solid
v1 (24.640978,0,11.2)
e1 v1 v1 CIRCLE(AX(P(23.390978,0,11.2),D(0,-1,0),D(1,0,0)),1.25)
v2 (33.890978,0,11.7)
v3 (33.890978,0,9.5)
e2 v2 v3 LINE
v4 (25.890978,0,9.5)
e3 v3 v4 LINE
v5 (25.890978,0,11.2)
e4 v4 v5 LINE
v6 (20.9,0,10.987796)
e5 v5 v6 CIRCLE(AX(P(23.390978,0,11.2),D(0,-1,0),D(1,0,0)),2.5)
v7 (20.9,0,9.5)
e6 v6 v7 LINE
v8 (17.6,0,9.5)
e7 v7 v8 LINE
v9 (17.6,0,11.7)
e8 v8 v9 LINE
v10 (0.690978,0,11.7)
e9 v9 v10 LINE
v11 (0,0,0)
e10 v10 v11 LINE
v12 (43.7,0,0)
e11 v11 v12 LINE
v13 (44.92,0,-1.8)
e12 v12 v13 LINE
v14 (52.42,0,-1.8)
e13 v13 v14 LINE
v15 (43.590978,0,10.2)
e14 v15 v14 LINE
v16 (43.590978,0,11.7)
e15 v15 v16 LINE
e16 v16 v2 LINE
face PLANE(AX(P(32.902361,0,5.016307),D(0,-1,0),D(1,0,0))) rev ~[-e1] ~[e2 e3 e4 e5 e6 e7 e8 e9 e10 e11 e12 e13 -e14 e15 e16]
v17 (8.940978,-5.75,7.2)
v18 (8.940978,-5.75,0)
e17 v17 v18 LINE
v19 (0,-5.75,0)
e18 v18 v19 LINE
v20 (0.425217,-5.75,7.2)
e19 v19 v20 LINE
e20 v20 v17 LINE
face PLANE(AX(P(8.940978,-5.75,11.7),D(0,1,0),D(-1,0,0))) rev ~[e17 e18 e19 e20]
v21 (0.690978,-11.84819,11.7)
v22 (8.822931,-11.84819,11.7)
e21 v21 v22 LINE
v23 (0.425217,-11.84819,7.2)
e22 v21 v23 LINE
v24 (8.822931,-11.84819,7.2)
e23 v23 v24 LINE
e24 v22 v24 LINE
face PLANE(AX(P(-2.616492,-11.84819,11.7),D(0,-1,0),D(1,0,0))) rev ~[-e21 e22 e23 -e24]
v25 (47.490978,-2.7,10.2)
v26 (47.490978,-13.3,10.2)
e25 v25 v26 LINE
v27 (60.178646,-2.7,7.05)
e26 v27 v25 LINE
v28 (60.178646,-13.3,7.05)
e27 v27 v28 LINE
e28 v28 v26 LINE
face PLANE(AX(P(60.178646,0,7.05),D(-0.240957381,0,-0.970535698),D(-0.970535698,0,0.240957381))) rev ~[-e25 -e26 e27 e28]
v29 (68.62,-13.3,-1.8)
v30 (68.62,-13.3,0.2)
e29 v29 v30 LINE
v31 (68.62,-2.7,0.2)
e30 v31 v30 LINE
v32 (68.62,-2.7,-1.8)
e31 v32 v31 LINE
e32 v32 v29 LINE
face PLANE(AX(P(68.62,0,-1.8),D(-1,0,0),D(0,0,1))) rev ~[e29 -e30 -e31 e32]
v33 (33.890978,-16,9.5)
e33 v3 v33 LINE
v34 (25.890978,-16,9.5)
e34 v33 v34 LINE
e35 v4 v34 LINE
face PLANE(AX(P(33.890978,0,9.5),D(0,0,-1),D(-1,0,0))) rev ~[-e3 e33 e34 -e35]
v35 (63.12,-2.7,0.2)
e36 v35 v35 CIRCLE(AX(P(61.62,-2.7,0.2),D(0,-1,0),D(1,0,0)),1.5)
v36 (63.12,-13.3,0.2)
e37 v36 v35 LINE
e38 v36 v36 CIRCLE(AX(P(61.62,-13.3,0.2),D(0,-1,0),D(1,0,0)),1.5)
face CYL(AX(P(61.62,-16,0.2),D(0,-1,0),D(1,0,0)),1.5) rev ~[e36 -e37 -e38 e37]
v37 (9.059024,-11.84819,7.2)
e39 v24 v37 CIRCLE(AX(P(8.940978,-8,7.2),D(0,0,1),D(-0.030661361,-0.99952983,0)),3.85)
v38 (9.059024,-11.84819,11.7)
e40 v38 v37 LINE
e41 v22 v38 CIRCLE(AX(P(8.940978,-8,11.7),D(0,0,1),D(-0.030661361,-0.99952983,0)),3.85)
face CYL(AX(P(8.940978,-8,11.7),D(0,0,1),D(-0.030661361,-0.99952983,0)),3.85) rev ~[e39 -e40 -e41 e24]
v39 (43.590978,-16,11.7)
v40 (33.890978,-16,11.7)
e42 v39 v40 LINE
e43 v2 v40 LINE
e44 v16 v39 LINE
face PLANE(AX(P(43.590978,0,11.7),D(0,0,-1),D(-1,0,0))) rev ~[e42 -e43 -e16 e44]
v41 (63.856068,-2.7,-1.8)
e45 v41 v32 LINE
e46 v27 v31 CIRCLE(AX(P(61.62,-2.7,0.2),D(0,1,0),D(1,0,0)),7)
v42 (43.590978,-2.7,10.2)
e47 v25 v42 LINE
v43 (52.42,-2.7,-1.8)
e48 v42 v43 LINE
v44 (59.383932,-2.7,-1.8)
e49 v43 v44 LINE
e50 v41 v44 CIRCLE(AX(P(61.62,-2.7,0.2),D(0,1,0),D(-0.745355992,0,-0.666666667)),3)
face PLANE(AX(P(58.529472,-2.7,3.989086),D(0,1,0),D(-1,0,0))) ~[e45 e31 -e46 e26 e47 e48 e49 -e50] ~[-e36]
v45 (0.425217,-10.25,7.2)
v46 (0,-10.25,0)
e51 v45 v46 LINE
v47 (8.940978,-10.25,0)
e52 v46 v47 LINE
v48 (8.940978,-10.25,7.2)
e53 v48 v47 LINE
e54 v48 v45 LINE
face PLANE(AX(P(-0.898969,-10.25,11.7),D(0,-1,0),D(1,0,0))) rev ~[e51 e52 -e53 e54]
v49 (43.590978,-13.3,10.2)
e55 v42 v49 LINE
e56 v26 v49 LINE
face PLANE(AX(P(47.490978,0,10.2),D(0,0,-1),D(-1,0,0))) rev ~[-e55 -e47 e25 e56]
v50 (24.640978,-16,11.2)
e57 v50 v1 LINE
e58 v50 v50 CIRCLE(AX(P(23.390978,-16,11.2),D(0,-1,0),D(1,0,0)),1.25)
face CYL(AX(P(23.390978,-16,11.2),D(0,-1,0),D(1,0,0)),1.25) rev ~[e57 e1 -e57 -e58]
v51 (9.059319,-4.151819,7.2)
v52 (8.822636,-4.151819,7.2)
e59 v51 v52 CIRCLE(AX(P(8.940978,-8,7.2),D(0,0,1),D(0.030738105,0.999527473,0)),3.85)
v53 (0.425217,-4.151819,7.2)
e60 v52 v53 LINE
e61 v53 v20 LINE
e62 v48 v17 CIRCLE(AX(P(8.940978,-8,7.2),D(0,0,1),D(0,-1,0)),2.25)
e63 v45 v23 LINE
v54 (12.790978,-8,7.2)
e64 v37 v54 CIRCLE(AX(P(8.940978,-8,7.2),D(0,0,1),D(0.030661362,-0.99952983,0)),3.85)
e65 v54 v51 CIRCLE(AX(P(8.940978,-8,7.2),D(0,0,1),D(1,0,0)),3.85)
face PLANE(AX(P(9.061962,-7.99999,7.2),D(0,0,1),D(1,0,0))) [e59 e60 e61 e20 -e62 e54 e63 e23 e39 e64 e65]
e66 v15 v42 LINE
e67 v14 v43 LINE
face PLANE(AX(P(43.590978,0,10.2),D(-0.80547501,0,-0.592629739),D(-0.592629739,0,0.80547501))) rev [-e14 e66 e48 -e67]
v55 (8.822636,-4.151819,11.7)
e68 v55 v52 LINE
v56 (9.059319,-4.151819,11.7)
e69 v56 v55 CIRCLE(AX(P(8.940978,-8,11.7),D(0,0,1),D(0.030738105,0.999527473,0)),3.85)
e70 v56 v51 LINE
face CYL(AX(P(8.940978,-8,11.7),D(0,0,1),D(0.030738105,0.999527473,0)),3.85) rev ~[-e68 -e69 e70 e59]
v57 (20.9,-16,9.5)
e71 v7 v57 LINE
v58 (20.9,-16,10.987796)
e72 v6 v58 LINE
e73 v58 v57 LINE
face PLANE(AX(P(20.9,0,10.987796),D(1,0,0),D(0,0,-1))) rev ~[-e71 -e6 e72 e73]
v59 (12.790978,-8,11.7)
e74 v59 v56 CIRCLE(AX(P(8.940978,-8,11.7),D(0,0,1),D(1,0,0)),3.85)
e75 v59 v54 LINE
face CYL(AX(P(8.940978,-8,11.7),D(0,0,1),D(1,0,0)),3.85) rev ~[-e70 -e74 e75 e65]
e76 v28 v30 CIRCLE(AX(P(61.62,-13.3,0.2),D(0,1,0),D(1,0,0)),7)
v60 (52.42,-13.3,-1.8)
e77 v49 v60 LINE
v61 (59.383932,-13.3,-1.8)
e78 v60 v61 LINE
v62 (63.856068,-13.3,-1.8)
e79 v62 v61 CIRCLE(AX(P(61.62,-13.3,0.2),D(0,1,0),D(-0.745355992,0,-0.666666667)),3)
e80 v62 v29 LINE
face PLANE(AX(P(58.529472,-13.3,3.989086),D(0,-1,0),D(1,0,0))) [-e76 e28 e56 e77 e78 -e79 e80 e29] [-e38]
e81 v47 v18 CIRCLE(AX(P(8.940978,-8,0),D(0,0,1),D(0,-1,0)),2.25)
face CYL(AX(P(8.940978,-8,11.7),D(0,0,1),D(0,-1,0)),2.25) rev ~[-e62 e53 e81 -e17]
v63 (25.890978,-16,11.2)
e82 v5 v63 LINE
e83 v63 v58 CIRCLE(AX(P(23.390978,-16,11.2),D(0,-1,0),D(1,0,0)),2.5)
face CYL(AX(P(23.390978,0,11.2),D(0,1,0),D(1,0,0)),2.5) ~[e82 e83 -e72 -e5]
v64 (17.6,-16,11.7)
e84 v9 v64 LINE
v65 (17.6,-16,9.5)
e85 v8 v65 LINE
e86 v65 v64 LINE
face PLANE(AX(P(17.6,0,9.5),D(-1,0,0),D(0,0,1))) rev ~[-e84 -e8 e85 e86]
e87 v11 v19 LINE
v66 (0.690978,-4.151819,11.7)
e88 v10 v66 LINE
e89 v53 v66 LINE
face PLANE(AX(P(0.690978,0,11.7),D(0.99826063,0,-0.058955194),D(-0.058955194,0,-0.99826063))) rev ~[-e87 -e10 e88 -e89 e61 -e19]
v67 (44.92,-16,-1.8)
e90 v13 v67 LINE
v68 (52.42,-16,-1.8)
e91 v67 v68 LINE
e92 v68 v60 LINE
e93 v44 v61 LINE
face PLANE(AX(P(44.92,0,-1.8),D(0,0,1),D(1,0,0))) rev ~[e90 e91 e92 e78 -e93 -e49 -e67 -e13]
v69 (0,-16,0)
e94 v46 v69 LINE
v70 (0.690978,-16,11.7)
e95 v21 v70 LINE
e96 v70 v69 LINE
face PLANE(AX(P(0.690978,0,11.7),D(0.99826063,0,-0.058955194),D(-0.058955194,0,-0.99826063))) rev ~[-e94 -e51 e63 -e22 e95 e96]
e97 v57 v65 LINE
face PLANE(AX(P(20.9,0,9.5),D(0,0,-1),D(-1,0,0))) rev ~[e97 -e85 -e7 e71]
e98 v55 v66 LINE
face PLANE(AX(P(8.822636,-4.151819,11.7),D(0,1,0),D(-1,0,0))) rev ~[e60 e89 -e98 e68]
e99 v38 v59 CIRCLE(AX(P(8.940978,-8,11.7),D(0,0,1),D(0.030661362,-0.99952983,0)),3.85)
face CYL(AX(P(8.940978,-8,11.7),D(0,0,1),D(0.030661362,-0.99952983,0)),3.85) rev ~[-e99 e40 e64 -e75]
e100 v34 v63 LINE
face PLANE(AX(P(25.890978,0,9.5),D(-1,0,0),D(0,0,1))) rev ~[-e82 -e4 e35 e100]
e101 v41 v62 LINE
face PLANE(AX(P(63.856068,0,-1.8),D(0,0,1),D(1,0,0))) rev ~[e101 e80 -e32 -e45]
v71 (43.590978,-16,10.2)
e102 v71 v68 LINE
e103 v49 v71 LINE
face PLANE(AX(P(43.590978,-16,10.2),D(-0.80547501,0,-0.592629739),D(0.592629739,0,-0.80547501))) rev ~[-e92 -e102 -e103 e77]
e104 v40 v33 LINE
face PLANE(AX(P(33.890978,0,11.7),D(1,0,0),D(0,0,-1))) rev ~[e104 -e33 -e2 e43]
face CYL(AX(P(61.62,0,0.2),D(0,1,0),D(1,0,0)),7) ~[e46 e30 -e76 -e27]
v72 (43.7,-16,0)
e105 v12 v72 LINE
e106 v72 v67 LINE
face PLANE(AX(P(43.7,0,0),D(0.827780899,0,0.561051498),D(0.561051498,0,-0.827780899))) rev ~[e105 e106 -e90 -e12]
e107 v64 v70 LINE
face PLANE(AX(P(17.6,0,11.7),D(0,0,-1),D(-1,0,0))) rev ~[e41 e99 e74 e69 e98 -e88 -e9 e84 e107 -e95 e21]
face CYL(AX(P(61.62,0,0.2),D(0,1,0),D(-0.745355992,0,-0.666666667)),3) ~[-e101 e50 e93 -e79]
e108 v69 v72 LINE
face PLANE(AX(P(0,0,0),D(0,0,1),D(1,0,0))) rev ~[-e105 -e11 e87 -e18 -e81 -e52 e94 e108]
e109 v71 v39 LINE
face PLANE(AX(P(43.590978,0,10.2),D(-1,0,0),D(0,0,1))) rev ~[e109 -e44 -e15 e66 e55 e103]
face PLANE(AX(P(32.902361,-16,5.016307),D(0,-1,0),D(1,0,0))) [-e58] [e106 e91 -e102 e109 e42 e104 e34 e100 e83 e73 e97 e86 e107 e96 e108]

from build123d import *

# Parameters (mm, degrees)
F1_DEPTH  = 16
F2_R      = 1.5
F2_R_2    = 1.25
F3_DEPTH  = 16.001
F5_DEPTH  = 2.7
F8_DEPTH  = 14.501
F9_DEPTH  = 25
F11_DEPTH = 4.5


# Not quite as in the source:
# - a pattern or mirror of a feature is missing from the dataset's text; its kind, count and spacing are read off the source's solid


with BuildPart() as f1:
    # F0 (on Front) → F1 (new body)
    with BuildSketch(Plane.XZ):
        with BuildLine():
            Line((0.6909776407, 11.7), (0, 0))
            Line((0, 0), (43.7, 0))
            Line((43.7, 0), (44.92, -1.8))
            Line((44.92, -1.8), (59.3839320225, -1.8))
            ThreePointArc((59.3839320225, -1.8), (61.62, -2.8), (63.8560679775, -1.8))
            Line((63.8560679775, -1.8), (68.62, -1.8))
            Line((68.62, -1.8), (68.62, 0.2))
            ThreePointArc((68.62, 0.2), (66.0308120163, 5.6355070929), (60.1786464695, 7.05))
            Line((60.1786464695, 7.05), (47.4909776407, 10.2))
            Line((47.4909776407, 10.2), (43.5909776407, 10.2))
            Line((43.5909776407, 10.2), (43.5909776407, 11.7))
            Line((43.5909776407, 11.7), (33.8909776407, 11.7))
            Line((33.8909776407, 11.7), (33.8909776407, 9.5))
            Line((33.8909776407, 9.5), (25.8909776407, 9.5))
            Line((25.8909776407, 9.5), (25.8909776407, 11.2))
            ThreePointArc((25.8909776407, 11.2), (23.2847799515, 13.6977433917), (20.9, 10.9877963389))
            Line((20.9, 10.9877963389), (20.9, 9.5))
            Line((20.9, 9.5), (17.6, 9.5))
            Line((17.6, 9.5), (17.6, 11.7))
            Line((17.6, 11.7), (0.6909776407, 11.7))
        make_face()
    extrude(amount=F1_DEPTH)

    # F2 (on face) → F3 (cut, through all)
    with BuildSketch(Plane.XZ.offset(16)):
        with Locations((61.62, 0.2)):
            Circle(F2_R)
        with Locations((23.3909776407, 11.2)):
            Circle(F2_R_2)
    extrude(amount=-F3_DEPTH, mode=Mode.SUBTRACT)

    # F4 (on face) → F5 (cut)
    with BuildSketch(Plane.XZ.offset(16)):
        Polygon((69.0573006868, 10.2), (43.5909776407, 10.2), (52.42, -1.8), (58.7147176266, -4.3849991634), (70.332378149, -4.3849991634), align=None)
    f5 = extrude(amount=-F5_DEPTH, mode=Mode.SUBTRACT)

    # F5_copies: F5 across plane
    add(f5.mirror(Plane.ZX.offset(-8)), mode=Mode.SUBTRACT)

    # F7 (on face) → F8 (cut, through all)
    with BuildSketch(Plane.XY.offset(11.7)):
        with BuildLine():
            Line((8.9409776407, -5.75), (0.6909776407, -5.75))
            Line((0.6909776407, -5.75), (0.6909776407, -10.25))
            Line((0.6909776407, -10.25), (8.9409776407, -10.25))
            ThreePointArc((8.9409776407, -10.25), (11.1909776407, -8), (8.9409776407, -5.75))
        make_face()
    extrude(amount=-F8_DEPTH, mode=Mode.SUBTRACT)

    # F7 (on face) → F9 (cut)
    with BuildSketch(Plane.XY.offset(11.7)):
        with BuildLine():
            Line((8.9409776407, -5.75), (0.6909776407, -5.75))
            Line((0.6909776407, -5.75), (-0.8989692941, -5.75))
            Line((-0.8989692941, -5.75), (-0.8989692941, -10.25))
            Line((-0.8989692941, -10.25), (0.6909776407, -10.25))
            Line((0.6909776407, -10.25), (8.9409776407, -10.25))
            ThreePointArc((8.9409776407, -10.25), (11.1909776407, -8), (8.9409776407, -5.75))
        make_face()
    extrude(amount=-F9_DEPTH, mode=Mode.SUBTRACT)

    # F10 (on face) → F11 (cut)
    with BuildSketch(Plane.XY.offset(11.7)):
        with BuildLine():
            ThreePointArc((9.0590238842, -11.8481898452), (11.7047592925, -10.6803005393), (12.7909776407, -8))
            ThreePointArc((12.7909776407, -8), (11.7048621847, -5.3198055617), (9.0593193409, -4.1518192296))
            Line((9.0593193409, -4.1518192296), (8.8226359404, -4.1518192296))
            ThreePointArc((8.8226359404, -4.1518192296), (5.0909776435, -8.000147798), (8.8229313971, -11.8481898452))
            Line((8.8229313971, -11.8481898452), (9.0590238842, -11.8481898452))
        make_face()
        with BuildLine():
            Line((8.8226359404, -4.1518192296), (9.0593193409, -4.1518192296))
            ThreePointArc((9.0593193409, -4.1518192296), (8.9409776407, -4.15), (8.8226359404, -4.1518192296))
        make_face()
        with BuildLine():
            ThreePointArc((8.8229313971, -11.8481898452), (8.9409776407, -11.85), (9.0590238842, -11.8481898452))
            Line((9.0590238842, -11.8481898452), (8.8229313971, -11.8481898452))
        make_face()
        with BuildLine():
            ThreePointArc((8.8229313971, -11.8481898452), (5.0909776435, -8.000147798), (8.8226359404, -4.1518192296))
            Line((8.8226359404, -4.1518192296), (-1.5180813544, -4.1518192296))
            Line((-1.5180813544, -4.1518192296), (-2.6164921116, -11.8481898452))
            Line((-2.6164921116, -11.8481898452), (8.8229313971, -11.8481898452))
        make_face()
    extrude(amount=-F11_DEPTH, mode=Mode.SUBTRACT)


solid = f1.part
